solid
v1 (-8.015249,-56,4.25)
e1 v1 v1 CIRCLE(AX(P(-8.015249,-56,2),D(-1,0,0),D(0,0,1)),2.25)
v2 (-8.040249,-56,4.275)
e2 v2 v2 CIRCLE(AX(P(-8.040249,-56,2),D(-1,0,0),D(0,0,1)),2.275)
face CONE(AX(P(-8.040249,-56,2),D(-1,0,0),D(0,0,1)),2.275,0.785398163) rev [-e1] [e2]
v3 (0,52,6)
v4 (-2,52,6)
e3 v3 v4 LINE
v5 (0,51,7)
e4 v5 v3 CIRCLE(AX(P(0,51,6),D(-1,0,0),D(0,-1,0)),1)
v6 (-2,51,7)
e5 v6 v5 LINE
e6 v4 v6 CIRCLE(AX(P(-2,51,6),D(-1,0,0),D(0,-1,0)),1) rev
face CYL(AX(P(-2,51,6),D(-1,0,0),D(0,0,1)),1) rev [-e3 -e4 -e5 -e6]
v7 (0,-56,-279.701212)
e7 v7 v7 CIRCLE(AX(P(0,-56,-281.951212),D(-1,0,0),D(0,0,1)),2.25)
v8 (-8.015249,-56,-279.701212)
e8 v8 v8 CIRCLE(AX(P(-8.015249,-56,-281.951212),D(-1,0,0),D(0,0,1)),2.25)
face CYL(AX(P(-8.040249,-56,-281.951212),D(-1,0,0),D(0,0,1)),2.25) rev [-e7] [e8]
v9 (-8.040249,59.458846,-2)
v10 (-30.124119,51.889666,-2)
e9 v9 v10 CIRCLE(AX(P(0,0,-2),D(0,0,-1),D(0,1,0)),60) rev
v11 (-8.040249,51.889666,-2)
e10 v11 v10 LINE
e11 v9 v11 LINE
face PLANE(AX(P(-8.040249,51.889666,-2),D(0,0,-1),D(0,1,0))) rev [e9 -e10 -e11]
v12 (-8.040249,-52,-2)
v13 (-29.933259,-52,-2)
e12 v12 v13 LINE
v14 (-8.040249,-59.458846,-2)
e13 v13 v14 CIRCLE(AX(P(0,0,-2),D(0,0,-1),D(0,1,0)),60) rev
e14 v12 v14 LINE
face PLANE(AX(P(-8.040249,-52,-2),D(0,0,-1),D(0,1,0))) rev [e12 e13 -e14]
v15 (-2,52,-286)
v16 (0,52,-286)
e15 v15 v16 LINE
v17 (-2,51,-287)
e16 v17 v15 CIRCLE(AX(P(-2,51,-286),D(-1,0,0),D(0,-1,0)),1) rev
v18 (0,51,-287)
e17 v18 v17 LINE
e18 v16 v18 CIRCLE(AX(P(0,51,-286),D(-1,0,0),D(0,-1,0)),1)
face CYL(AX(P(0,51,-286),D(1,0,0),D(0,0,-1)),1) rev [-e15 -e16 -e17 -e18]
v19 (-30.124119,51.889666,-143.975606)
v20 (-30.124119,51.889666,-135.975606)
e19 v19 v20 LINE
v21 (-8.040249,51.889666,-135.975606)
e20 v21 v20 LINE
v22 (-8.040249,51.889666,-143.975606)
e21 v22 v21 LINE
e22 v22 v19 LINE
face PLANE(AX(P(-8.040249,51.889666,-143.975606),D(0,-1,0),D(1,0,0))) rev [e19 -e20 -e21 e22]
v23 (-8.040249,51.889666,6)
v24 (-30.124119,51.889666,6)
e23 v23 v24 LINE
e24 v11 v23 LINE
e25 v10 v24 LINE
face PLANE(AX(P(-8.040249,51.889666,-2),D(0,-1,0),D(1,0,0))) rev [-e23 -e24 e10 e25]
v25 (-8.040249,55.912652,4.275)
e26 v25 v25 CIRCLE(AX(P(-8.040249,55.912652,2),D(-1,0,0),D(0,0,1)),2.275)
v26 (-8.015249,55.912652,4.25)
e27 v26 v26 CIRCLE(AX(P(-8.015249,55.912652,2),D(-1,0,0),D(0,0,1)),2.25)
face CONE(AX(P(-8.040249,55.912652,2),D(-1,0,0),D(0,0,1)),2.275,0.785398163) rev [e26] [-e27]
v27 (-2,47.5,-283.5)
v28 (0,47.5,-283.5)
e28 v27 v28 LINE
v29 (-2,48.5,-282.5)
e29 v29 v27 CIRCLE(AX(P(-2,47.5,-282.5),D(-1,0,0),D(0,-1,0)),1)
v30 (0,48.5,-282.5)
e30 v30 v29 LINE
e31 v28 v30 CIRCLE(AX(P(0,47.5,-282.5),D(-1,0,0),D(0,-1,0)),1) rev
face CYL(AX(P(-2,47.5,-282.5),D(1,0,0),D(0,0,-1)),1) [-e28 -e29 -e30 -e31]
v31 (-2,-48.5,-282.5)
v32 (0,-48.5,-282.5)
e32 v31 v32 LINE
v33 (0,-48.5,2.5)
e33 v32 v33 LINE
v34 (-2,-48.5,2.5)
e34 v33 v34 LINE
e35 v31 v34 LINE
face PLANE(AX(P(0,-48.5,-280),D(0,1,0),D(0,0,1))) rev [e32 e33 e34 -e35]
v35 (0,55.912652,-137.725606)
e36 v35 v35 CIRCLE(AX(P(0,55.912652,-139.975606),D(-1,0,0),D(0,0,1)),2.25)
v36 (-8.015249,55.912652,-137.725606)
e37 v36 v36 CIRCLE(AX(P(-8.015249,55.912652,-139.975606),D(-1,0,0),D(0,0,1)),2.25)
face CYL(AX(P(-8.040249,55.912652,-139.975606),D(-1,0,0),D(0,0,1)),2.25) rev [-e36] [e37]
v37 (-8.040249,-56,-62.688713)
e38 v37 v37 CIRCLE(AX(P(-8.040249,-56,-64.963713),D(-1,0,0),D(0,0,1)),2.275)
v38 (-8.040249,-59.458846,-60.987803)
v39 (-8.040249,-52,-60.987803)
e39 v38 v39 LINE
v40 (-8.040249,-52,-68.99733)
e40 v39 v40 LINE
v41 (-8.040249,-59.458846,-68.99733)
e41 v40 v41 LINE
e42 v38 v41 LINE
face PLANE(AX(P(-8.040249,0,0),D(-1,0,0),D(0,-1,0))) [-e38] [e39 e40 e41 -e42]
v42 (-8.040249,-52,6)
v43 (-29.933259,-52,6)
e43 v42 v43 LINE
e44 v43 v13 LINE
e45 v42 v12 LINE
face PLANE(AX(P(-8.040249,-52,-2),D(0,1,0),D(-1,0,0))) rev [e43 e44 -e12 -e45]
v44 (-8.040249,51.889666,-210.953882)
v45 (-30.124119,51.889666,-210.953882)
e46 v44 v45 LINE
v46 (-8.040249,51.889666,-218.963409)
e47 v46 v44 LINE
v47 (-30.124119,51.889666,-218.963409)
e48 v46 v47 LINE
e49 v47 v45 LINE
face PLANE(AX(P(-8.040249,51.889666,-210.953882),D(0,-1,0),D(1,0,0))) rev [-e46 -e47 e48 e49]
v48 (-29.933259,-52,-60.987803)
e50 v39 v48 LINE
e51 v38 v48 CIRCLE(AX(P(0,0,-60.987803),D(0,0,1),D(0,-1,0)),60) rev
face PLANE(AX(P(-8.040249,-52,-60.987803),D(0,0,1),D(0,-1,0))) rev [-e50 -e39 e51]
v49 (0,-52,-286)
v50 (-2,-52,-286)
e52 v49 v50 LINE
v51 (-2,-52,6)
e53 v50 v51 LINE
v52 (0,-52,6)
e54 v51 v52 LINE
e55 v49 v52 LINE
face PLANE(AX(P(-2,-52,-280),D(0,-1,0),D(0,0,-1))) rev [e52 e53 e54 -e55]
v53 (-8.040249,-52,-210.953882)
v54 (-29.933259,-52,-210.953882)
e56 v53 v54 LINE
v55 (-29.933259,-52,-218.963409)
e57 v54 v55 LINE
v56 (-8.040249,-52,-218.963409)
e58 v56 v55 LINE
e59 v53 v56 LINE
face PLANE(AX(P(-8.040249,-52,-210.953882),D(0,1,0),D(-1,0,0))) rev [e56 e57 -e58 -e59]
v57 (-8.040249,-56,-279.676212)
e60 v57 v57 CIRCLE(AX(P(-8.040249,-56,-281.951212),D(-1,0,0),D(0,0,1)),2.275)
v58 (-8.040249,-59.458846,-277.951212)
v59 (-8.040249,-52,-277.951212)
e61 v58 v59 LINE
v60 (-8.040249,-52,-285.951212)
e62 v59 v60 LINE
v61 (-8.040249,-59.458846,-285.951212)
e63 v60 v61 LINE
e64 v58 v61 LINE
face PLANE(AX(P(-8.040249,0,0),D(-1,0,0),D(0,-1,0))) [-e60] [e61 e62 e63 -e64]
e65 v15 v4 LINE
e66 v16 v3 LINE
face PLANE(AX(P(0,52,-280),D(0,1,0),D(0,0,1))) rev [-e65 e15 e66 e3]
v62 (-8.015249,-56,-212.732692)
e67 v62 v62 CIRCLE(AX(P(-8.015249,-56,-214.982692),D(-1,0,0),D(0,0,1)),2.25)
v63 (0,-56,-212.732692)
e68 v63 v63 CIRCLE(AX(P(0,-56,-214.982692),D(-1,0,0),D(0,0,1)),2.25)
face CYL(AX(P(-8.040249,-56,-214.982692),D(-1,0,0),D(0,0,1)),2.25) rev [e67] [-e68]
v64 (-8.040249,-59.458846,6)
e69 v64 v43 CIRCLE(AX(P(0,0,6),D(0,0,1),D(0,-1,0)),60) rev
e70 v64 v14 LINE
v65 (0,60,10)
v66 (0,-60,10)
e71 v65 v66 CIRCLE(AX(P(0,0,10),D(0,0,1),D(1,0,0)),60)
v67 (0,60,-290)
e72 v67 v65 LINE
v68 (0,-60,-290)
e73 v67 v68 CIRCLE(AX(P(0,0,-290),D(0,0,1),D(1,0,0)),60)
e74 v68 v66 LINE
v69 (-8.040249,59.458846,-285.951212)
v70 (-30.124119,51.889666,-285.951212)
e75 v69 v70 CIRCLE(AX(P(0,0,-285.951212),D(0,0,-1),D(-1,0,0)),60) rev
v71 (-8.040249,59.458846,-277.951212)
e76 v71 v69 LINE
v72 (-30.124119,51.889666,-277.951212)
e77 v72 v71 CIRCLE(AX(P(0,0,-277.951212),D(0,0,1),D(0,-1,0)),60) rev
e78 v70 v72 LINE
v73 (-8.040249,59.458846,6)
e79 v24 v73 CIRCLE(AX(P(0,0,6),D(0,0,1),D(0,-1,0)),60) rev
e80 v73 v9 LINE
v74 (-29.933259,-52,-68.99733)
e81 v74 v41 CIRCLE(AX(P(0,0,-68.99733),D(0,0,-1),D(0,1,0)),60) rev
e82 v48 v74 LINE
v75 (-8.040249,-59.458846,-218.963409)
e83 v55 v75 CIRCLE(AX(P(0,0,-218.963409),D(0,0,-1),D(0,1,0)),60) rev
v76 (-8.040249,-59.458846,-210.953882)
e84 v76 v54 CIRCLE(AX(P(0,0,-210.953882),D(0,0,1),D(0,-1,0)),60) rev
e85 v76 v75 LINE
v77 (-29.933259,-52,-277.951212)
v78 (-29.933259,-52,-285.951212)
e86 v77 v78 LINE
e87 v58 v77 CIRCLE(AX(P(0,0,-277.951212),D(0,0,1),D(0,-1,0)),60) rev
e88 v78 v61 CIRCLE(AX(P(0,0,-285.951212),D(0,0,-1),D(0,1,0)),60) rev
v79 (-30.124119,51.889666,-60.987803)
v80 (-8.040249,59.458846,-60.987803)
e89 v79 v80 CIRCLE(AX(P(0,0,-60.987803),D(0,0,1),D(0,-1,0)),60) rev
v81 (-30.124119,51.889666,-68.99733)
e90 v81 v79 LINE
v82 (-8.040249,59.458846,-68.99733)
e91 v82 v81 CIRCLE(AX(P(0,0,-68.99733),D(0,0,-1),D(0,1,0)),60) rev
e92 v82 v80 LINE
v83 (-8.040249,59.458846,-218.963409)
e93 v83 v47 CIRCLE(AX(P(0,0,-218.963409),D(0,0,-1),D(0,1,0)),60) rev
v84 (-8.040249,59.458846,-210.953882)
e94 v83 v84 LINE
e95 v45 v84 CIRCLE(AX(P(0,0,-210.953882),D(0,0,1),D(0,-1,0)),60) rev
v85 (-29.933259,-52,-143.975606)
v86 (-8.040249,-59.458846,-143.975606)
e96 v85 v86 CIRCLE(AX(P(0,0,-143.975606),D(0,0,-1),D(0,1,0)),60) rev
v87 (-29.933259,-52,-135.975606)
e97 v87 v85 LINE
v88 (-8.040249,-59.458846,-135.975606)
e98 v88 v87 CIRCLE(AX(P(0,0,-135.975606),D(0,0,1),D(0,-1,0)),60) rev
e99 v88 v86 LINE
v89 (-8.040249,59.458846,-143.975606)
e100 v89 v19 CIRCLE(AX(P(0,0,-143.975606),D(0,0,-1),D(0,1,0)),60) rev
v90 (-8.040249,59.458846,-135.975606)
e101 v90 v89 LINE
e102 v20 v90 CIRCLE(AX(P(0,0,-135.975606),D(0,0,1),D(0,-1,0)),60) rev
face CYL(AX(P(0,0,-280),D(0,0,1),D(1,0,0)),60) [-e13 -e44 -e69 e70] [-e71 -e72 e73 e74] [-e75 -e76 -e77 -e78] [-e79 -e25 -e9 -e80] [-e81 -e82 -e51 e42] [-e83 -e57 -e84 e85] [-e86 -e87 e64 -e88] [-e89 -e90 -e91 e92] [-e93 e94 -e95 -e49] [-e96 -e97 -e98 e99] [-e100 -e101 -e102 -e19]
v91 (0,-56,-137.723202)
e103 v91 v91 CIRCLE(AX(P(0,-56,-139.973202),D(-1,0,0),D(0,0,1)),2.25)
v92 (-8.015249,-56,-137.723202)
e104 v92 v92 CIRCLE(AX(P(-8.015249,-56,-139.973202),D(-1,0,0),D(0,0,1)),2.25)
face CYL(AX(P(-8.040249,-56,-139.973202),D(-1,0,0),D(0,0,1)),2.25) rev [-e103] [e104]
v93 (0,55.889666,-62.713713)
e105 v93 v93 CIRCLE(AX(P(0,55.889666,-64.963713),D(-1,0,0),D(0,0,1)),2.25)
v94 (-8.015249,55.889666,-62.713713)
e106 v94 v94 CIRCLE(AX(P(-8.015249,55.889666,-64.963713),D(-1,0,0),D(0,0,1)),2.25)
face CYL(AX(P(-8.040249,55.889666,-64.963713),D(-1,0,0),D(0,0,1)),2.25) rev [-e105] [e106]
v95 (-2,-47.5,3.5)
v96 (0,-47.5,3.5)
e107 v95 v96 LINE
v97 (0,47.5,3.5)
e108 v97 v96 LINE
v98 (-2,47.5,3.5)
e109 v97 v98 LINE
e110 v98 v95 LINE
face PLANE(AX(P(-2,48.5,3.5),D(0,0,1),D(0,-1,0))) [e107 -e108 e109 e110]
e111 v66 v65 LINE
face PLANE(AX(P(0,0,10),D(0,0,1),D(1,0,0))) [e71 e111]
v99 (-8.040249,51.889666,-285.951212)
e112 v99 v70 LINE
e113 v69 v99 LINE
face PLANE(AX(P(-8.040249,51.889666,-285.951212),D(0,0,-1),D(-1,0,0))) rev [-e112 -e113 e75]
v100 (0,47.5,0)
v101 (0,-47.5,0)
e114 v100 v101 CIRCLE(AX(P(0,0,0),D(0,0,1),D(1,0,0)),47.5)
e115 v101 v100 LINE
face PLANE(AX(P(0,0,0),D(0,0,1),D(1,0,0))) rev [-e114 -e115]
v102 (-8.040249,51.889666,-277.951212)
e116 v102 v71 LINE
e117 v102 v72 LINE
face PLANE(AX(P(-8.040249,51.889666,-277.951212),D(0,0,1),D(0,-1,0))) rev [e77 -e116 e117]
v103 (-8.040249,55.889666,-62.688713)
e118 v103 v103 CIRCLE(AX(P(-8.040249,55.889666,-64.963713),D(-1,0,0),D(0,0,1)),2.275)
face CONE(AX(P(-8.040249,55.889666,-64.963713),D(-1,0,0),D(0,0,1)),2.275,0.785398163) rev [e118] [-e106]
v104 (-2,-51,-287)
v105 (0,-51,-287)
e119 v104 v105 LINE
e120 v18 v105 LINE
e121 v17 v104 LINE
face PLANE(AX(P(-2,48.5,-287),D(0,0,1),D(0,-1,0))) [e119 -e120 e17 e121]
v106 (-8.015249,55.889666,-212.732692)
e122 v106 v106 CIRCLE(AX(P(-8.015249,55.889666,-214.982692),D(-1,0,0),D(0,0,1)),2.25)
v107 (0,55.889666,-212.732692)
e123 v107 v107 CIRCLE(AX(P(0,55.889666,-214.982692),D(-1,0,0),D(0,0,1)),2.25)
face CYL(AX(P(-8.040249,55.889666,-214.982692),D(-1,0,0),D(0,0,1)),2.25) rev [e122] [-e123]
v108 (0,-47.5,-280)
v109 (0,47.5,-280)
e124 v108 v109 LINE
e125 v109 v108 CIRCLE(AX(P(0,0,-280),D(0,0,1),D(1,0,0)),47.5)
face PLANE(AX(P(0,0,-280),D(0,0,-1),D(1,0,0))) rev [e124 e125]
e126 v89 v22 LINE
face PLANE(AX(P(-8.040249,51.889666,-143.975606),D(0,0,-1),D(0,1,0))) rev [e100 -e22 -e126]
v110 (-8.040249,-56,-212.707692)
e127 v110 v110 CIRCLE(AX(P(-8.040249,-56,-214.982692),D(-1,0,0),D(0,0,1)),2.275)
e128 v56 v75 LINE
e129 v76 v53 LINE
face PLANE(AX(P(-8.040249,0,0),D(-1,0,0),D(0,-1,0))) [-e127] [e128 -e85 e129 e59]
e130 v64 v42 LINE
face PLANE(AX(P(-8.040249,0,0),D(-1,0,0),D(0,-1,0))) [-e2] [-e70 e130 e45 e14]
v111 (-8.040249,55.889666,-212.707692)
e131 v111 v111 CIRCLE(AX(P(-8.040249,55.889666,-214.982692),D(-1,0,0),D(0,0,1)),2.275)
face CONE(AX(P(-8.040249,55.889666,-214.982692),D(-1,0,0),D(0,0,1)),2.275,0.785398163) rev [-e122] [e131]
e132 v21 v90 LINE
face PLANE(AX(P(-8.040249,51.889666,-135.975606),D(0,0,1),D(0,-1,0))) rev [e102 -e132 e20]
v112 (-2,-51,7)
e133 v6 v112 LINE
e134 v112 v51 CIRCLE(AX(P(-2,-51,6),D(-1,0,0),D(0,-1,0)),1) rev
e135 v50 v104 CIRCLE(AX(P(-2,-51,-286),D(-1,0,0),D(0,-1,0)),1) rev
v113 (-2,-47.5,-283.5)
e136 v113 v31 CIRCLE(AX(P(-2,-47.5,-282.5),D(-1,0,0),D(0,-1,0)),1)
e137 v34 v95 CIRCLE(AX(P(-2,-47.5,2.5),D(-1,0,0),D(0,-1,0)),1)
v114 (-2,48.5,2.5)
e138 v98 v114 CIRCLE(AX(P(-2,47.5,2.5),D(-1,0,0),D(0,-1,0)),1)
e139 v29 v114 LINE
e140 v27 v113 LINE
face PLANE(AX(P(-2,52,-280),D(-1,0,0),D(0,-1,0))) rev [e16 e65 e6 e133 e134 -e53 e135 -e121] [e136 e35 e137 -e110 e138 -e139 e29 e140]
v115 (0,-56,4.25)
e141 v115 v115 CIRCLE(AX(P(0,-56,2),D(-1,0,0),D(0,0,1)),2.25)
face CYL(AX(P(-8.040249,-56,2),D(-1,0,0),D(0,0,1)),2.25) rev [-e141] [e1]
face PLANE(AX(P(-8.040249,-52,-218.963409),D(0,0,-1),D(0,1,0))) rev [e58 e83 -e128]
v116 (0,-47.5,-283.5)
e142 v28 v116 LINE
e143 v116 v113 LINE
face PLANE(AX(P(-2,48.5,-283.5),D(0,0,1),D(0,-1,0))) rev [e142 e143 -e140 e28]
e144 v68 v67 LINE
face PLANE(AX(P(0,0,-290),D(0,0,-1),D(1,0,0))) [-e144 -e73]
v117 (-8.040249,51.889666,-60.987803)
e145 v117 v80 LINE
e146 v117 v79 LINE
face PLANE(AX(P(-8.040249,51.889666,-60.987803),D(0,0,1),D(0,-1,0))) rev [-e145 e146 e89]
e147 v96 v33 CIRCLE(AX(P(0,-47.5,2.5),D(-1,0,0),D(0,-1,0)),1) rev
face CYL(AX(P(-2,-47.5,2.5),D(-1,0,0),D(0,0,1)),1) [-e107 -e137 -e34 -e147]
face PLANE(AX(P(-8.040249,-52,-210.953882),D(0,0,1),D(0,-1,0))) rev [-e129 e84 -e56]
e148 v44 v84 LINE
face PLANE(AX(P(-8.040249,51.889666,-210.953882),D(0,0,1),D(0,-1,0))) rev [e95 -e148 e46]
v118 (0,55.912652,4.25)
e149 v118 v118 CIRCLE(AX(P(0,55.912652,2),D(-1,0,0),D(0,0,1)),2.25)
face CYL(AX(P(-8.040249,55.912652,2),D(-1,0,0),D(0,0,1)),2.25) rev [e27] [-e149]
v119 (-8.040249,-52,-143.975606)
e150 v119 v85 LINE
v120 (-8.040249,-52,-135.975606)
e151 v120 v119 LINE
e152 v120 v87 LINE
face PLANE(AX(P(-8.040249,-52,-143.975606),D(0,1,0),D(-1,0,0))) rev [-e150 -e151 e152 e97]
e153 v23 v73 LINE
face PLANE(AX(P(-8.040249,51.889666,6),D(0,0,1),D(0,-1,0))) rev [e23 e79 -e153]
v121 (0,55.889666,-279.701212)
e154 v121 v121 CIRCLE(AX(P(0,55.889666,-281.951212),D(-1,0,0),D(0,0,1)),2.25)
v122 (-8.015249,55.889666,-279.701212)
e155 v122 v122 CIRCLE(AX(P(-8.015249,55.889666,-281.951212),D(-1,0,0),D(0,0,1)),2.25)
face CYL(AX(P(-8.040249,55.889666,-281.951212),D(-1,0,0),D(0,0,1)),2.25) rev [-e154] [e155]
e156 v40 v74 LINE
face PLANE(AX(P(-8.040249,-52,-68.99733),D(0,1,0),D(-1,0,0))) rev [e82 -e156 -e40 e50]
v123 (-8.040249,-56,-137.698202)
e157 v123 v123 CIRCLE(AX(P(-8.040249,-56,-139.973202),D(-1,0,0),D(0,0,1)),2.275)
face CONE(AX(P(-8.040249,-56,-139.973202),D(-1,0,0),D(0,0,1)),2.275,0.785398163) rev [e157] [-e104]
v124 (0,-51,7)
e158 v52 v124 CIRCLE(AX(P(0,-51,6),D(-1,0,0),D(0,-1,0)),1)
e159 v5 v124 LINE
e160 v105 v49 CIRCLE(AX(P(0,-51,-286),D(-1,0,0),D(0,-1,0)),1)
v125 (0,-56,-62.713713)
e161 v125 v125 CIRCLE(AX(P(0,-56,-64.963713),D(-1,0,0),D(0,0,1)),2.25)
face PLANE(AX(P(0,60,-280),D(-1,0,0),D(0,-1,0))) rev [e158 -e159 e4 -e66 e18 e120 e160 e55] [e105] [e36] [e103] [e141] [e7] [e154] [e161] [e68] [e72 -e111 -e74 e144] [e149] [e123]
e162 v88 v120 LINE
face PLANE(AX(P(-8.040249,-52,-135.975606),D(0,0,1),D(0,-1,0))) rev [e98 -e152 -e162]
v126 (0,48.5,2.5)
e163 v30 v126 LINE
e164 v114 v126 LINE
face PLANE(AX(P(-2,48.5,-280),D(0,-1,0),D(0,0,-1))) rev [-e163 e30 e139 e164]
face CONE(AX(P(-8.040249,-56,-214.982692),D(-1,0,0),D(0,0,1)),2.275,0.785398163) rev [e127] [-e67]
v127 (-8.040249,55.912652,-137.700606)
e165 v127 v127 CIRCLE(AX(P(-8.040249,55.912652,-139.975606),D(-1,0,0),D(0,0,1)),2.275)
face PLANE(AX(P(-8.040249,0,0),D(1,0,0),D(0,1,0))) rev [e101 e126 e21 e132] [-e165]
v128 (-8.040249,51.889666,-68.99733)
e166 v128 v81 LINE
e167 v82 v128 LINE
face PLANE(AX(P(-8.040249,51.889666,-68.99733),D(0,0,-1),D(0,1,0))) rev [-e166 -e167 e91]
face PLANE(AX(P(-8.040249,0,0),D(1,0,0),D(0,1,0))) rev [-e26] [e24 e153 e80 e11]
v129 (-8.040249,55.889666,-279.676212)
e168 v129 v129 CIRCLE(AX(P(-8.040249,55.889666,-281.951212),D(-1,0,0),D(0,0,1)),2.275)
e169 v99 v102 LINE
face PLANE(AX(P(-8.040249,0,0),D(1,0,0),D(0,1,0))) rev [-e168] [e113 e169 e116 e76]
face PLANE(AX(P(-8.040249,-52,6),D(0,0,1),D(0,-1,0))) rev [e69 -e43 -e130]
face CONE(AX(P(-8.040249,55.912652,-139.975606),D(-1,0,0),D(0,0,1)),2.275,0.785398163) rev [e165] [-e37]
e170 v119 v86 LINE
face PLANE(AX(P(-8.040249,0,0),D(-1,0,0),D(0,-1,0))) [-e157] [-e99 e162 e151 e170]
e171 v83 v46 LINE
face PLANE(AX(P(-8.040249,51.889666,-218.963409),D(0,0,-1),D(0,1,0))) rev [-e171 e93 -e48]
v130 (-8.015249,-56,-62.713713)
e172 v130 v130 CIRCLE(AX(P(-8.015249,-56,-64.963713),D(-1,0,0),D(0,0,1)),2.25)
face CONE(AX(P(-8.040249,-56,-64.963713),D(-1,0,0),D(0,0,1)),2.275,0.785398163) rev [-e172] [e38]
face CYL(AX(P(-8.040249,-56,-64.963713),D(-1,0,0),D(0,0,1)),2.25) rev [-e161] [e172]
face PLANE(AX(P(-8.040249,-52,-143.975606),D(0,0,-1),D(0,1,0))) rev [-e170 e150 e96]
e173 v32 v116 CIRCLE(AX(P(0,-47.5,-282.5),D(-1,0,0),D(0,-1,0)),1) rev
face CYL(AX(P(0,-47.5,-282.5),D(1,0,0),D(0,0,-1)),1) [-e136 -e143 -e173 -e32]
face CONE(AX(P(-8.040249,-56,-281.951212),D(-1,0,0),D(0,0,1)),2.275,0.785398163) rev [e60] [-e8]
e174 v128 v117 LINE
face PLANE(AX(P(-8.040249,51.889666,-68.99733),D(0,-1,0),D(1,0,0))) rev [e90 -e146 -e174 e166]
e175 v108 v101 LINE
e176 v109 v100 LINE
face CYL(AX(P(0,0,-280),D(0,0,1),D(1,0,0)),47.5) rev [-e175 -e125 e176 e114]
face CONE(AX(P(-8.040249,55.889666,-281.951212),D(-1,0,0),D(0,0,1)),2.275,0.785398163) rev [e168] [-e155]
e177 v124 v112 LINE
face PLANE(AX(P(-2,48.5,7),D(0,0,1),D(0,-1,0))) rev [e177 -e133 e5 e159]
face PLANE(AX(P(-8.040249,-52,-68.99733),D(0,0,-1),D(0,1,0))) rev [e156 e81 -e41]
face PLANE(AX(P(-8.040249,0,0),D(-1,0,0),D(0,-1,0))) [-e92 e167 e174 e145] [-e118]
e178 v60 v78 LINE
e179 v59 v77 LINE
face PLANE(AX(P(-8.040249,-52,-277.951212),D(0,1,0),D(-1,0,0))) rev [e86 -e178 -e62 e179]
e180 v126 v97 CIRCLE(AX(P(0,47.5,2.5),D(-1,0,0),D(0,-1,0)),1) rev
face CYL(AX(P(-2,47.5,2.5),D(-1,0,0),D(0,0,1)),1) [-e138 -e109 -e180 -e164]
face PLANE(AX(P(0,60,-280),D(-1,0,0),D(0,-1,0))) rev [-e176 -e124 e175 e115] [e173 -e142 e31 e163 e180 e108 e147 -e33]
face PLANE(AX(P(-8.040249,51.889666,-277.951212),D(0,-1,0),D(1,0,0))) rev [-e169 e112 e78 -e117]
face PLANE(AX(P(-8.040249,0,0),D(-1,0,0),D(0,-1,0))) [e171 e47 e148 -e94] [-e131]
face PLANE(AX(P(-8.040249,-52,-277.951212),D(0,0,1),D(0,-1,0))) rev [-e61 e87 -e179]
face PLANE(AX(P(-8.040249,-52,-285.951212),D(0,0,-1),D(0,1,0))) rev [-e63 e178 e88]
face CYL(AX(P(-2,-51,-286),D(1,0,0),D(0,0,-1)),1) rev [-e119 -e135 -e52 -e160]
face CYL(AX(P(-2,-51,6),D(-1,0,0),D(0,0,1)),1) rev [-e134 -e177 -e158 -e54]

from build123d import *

# Parameters (mm, degrees)
BOSS_EXTRUDE1_DEPTH            = 280
BOSS_EXTRUDE3_START            = 10
BOSS_EXTRUDE3_DEPTH            = 10
CUT_EXTRUDE_THIN1_START        = -2
CUT_EXTRUDE_THIN1_DEPTH        = 2
FILLET6_R                      = 1
SKETCH11_W                     = 8
SKETCH11_H                     = 8
SKETCH11_W_2                   = 8.009527264
CUT_EXTRUDE1_DEPTH             = 51
M4_CLEARANCE_HOLE1_D           = 4.5
M4_CLEARANCE_HOLE1_CSINK_D     = 4.55
M4_CLEARANCE_HOLE1_CSINK_ANGLE = 90


# Read off the part's stored shape, not the designer's step: Cut-Extrude-Thin1
with BuildPart() as part:
    # Sketch1 → Boss-Extrude1 (new body)
    with BuildSketch(Plane.XY):
        with BuildLine():
            Line((0, 52), (-2, 52))
            Line((-2, 52), (-2, 48.5))
            Line((-2, 48.5), (0, 48.5))
            Line((0, 48.5), (0, 47.5))
            ThreePointArc((0, 47.5), (-47.5, 0), (0, -47.5))
            Line((0, -47.5), (0, -48.5))
            Line((0, -48.5), (-2, -48.5))
            Line((-2, -48.5), (-2, -52))
            Line((-2, -52), (0, -52))
            Line((0, -52), (0, -60))
            ThreePointArc((0, -60), (-60, 0), (0, 60))
            Line((0, 60), (0, 52))
        make_face()
    extrude(amount=-BOSS_EXTRUDE1_DEPTH)

    # Sketch7 → Boss-Extrude3 (add)
    with BuildSketch(Plane.XY.offset(BOSS_EXTRUDE3_START)):
        with BuildLine():
            Line((0, 60), (0, -60))
            ThreePointArc((0, -60), (-60, 0), (0, 60))
        make_face()
    boss_extrude3 = extrude(amount=-BOSS_EXTRUDE3_DEPTH)

    # Mirror1: Boss-Extrude3 across plane
    add(boss_extrude3.mirror(Plane.XY.offset(-140)))

    # Cut-Extrude-Thin1 outline → Cut-Extrude-Thin1 (cut)
    with BuildSketch(Plane(origin=(0, 0, 0), x_dir=(0, 0, -1), z_dir=(1, 0, 0)).offset(CUT_EXTRUDE_THIN1_START)):
        Polygon((0, 52), (-7, 52), (-7, -52), (0, -52), (0, -48.5), (-3.5, -48.5), (-3.5, 48.5), (0, 48.5), align=None)
    cut_extrude_thin1 = extrude(amount=CUT_EXTRUDE_THIN1_DEPTH, mode=Mode.SUBTRACT)

    # Mirror2: Cut-Extrude-Thin1 across plane
    add(cut_extrude_thin1.mirror(Plane.XY.offset(-140)), mode=Mode.SUBTRACT)

    # Fillet6
    fillet6_edges = [part.edges().sort_by_distance(p)[0] for p in [
        (-1, -52, 7),
        (-1, 52, 7),
        (-1, 48.5, 3.5),
        (-1, -48.5, 3.5),
        (-1, -52, -287),
        (-1, -48.5, -283.5),
        (-1, 48.5, -283.5),
        (-1, 52, -287),
    ]]
    fillet(fillet6_edges, radius=FILLET6_R)

    # Sketch11 → Cut-Extrude1 (cut)
    with BuildSketch(Plane(origin=(-59.040249017, 0, 0), x_dir=(0, 0, -1), z_dir=(-1, 0, 0))):
        with Locations((139.975606131, 56)):
            Rectangle(SKETCH11_W, SKETCH11_H)
        with Locations((-2, 56)):
            Rectangle(SKETCH11_W, SKETCH11_H)
        with Locations((-2, -55.889665958)):
            Rectangle(SKETCH11_W, SKETCH11_H)
        with Locations((139.975606131, -55.889665958)):
            Rectangle(SKETCH11_W, SKETCH11_H)
        with Locations((281.951212263, 56)):
            Rectangle(SKETCH11_W, SKETCH11_H)
        with Locations((281.951212263, -55.889665958)):
            Rectangle(SKETCH11_W, SKETCH11_H)
        with Locations((64.992566698, 56)):
            Rectangle(SKETCH11_W_2, SKETCH11_H)
        with Locations((214.958645565, 56)):
            Rectangle(SKETCH11_W_2, SKETCH11_H)
        with Locations((214.958645565, -55.889665958)):
            Rectangle(SKETCH11_W_2, SKETCH11_H)
        with Locations((64.992566698, -55.889665958)):
            Rectangle(SKETCH11_W_2, SKETCH11_H)
    extrude(amount=-CUT_EXTRUDE1_DEPTH, mode=Mode.SUBTRACT)

    # M4 Clearance Hole1 (through all)
    with Locations(Plane.ZY.offset(8.040249017)):
        with Locations((-281.951212263, 55.889665958), (-281.951212263, -56), (-139.973202333, -56), (2, -56), (2, 55.912652005), (-139.975606131, 55.912652005), (-214.982691693, 55.889665958), (-64.963712973, 55.889665958), (-214.982691693, -56), (-64.963712973, -56)):
            CounterSinkHole(M4_CLEARANCE_HOLE1_D / 2, M4_CLEARANCE_HOLE1_CSINK_D / 2, counter_sink_angle=M4_CLEARANCE_HOLE1_CSINK_ANGLE)


solid = part.part
